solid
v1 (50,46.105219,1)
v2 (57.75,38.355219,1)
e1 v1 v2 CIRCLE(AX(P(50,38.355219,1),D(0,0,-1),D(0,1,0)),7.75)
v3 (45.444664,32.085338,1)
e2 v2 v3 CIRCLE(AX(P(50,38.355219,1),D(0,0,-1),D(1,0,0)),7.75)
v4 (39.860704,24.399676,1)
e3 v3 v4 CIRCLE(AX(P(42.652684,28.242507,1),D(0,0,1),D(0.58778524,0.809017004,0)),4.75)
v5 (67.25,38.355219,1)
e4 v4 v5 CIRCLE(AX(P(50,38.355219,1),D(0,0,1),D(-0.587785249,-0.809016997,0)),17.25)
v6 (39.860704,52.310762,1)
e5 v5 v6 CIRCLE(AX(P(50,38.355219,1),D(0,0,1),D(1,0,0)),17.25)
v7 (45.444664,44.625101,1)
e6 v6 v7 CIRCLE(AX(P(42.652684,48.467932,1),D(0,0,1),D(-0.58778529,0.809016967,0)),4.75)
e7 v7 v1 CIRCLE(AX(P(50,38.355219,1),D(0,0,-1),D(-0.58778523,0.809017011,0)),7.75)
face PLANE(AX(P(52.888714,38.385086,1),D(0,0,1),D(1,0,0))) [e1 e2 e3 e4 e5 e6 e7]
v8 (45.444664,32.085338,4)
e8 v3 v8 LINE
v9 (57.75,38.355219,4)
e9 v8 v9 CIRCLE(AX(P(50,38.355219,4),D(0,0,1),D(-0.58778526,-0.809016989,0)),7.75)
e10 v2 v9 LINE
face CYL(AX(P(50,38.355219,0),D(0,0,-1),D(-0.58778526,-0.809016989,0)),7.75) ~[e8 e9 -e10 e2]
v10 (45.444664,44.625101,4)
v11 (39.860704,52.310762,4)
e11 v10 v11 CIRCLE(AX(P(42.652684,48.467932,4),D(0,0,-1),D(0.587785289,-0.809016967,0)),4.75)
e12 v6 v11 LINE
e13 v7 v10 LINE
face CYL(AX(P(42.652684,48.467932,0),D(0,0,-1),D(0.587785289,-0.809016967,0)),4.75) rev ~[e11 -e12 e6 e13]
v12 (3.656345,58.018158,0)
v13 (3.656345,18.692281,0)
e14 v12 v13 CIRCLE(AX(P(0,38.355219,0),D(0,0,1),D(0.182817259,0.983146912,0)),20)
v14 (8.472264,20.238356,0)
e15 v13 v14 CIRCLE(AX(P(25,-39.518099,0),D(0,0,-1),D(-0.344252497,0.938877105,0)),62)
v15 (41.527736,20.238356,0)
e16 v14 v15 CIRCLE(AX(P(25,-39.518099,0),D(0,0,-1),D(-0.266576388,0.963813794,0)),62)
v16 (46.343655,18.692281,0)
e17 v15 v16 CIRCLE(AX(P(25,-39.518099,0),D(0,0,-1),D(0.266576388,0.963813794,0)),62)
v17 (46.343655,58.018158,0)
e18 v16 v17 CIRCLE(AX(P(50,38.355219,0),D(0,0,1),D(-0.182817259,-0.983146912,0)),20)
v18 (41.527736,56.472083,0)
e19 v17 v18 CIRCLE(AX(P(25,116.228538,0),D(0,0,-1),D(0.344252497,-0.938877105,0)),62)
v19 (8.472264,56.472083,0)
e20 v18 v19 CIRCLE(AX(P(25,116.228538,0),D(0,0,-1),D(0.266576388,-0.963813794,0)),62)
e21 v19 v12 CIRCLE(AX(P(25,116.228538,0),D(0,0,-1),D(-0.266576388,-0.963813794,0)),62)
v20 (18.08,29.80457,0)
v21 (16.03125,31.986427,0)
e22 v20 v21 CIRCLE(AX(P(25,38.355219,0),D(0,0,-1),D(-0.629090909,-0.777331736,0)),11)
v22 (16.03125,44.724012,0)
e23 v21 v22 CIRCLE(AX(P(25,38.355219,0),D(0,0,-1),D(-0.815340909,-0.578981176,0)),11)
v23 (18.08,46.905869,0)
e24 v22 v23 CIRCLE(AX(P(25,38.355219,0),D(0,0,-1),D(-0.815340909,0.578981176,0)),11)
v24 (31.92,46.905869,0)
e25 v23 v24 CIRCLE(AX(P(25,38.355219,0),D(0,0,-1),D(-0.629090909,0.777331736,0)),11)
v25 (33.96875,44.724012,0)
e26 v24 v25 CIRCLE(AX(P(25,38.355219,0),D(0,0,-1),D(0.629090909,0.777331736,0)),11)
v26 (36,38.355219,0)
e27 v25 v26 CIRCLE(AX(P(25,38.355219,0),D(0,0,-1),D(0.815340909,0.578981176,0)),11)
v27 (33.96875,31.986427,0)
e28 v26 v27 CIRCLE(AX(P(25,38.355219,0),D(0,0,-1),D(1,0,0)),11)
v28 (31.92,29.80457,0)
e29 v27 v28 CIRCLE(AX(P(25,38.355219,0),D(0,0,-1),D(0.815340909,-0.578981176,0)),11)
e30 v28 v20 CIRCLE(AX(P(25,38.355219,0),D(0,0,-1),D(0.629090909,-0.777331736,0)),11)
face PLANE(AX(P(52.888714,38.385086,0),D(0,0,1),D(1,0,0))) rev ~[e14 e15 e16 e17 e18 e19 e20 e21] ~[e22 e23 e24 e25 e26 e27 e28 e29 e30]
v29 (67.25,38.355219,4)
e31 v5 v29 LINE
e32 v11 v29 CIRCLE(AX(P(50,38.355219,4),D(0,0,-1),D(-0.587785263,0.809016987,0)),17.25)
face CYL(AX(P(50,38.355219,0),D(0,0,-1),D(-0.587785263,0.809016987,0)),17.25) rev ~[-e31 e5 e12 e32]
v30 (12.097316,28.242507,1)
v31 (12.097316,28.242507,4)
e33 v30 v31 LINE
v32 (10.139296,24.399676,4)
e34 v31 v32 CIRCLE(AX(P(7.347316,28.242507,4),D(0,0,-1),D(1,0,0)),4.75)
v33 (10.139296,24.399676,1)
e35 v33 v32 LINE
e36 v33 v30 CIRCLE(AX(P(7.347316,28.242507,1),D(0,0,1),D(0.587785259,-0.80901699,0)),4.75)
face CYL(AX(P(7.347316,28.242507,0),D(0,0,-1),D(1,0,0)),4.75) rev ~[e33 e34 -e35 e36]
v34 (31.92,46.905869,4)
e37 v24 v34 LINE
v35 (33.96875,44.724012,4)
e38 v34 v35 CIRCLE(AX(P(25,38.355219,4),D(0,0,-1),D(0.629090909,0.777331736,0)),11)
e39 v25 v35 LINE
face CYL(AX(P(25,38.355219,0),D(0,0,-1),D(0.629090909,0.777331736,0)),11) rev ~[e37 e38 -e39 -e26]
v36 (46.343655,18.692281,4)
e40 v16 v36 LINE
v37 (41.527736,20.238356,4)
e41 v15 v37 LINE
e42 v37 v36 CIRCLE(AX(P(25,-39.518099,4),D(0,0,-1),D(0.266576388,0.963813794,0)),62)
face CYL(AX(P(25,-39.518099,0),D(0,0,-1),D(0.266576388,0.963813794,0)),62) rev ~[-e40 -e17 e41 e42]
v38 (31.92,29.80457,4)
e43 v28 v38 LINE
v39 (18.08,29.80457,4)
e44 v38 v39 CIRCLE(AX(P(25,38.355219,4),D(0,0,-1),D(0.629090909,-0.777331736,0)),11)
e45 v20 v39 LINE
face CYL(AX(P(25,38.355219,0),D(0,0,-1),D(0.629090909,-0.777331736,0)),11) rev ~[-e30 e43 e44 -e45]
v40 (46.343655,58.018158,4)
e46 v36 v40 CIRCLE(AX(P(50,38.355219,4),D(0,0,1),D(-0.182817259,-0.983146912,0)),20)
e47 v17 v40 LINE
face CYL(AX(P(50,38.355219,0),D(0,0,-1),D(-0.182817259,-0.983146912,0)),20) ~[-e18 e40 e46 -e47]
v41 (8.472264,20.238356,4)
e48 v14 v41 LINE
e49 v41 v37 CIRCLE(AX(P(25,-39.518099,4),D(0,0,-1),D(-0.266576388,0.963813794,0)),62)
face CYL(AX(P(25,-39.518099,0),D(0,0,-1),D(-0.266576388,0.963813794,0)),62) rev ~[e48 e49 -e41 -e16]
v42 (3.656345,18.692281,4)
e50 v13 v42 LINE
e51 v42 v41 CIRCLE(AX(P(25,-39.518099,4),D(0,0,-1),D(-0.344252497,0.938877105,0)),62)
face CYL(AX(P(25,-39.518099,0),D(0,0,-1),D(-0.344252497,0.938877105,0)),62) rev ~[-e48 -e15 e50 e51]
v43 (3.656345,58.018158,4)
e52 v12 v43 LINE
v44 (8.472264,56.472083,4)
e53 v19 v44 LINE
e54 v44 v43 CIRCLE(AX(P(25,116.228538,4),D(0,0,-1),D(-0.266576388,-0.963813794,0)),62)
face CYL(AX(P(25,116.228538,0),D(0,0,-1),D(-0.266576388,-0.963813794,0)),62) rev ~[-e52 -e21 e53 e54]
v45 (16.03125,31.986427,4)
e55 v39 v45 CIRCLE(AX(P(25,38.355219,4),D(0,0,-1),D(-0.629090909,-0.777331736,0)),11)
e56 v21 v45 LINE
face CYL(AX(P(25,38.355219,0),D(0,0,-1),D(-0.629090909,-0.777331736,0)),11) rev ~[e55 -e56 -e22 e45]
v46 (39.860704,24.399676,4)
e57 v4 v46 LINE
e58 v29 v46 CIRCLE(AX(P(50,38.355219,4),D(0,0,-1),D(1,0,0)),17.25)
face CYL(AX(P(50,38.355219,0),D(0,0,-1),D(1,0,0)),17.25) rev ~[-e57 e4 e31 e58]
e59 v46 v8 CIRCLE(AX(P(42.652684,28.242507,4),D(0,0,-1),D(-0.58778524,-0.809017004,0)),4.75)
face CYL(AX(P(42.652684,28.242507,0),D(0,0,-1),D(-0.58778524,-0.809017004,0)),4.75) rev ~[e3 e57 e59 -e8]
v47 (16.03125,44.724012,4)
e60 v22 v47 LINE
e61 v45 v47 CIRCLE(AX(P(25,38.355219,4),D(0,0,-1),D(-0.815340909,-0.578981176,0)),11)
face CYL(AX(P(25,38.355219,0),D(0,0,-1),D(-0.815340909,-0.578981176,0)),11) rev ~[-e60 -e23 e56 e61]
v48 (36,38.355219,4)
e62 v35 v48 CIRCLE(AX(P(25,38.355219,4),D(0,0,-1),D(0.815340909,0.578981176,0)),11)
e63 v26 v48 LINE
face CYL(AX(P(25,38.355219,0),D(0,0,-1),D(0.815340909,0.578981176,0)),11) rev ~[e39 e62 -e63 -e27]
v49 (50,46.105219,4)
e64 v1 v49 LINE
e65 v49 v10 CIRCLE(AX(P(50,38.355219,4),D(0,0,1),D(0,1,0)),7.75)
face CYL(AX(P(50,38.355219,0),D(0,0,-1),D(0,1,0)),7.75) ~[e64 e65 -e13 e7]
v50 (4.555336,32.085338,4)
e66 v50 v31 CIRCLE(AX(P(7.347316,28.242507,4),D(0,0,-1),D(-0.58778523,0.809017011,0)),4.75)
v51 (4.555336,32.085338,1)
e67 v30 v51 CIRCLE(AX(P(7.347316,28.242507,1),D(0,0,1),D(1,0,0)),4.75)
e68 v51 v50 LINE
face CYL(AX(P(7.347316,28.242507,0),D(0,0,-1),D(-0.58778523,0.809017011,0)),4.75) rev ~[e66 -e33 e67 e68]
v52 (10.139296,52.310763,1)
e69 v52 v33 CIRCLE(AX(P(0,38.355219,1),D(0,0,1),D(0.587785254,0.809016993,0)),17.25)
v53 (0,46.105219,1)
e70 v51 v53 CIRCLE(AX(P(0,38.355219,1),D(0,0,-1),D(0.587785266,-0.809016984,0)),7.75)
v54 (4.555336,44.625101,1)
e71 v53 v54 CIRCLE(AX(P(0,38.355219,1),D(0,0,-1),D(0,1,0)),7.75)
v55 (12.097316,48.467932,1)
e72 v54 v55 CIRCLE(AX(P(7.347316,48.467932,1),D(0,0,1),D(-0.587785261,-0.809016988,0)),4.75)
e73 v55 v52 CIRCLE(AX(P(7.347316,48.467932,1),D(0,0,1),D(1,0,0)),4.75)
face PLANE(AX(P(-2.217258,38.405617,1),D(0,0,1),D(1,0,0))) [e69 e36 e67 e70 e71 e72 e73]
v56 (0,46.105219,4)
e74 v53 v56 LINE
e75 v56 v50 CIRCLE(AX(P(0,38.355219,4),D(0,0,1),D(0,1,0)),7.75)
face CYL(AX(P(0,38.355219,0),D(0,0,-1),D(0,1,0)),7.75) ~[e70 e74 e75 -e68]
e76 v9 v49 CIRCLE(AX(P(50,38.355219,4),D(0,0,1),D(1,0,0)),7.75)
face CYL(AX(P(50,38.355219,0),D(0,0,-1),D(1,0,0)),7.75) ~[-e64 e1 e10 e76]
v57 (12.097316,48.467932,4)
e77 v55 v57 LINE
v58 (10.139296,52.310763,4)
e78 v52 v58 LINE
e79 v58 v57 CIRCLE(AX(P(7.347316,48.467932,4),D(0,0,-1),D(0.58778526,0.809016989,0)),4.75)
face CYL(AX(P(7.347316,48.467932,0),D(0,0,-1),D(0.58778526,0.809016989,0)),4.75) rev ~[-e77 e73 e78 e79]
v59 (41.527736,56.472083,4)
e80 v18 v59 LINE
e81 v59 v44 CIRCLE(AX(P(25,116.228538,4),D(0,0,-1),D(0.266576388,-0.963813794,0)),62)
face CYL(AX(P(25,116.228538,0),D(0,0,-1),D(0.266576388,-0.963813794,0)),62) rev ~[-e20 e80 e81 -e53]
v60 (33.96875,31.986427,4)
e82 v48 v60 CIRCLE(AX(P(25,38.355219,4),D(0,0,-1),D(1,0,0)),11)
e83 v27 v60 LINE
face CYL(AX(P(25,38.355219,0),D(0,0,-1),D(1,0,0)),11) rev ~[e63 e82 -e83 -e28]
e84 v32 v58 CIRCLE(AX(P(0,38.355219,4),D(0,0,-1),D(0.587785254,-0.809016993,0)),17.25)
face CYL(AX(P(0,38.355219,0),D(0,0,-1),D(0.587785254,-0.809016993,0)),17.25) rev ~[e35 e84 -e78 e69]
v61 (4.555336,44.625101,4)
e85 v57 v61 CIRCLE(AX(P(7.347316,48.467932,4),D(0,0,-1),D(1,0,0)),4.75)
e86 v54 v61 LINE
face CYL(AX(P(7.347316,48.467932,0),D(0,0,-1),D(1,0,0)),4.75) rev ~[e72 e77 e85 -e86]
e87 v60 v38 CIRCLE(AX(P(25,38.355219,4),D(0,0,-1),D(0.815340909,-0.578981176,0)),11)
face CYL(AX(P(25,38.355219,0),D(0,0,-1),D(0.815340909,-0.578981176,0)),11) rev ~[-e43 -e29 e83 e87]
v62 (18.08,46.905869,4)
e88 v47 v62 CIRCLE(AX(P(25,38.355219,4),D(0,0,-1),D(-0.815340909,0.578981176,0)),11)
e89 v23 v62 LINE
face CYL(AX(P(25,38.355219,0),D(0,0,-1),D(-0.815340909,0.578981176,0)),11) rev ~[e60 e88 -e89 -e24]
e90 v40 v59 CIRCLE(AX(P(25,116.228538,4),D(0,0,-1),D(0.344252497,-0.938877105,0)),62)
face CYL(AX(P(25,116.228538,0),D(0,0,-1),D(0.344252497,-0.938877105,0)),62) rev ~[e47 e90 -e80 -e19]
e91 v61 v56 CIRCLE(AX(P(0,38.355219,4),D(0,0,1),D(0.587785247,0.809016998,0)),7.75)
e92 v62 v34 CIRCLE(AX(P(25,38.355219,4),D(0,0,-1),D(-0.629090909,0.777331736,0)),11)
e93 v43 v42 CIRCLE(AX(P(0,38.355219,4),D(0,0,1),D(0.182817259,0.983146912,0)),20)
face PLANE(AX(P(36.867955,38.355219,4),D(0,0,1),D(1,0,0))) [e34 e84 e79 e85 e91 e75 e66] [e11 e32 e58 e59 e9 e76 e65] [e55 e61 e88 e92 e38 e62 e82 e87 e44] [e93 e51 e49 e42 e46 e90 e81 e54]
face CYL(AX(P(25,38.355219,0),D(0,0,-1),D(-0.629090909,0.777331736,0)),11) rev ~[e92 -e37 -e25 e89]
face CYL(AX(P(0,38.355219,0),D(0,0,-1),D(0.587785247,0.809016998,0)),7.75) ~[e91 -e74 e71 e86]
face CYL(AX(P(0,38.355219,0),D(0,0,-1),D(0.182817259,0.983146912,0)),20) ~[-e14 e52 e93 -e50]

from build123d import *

# Parameters (mm, degrees)
F1_DEPTH = 4
F2_DEPTH = 1


with BuildPart() as f1:
    # F0 (on Top) → F1 (new body)
    with BuildSketch(Plane.XY):
        with BuildLine():
            ThreePointArc((33.96875, 44.7240123715), (35.4798914594, 41.6976549267), (36, 38.3552194374))
            ThreePointArc((36, 38.3552194374), (35.4798914594, 35.0127839481), (33.96875, 31.9864265033))
            ThreePointArc((33.96875, 31.9864265033), (34.890304672, 30.0329837344), (36.04875, 28.2100174464))
            ThreePointArc((36.04875, 28.2100174464), (38.9773253879, 32.9114730252), (40, 38.3552194374))
            ThreePointArc((40, 38.3552194374), (38.9773253879, 43.7989658495), (36.04875, 48.5004214283))
            ThreePointArc((36.04875, 48.5004214283), (34.890304672, 46.6774551404), (33.96875, 44.7240123715))
        make_face()
        with BuildLine():
            ThreePointArc((31.92, 46.9058685355), (33.0189287452, 45.8849459782), (33.96875, 44.7240123715))
            ThreePointArc((33.96875, 44.7240123715), (34.890304672, 46.6774551404), (36.04875, 48.5004214283))
            ThreePointArc((36.04875, 48.5004214283), (35.0671824784, 49.4751041915), (34, 50.3552194374))
            ThreePointArc((34, 50.3552194374), (32.8729423014, 48.6830408238), (31.92, 46.9058685355))
        make_face()
        with BuildLine():
            ThreePointArc((36.04875, 28.2100174464), (34.890304672, 30.0329837344), (33.96875, 31.9864265033))
            ThreePointArc((33.96875, 31.9864265033), (33.0189287452, 30.8254928966), (31.92, 29.8045703392))
            ThreePointArc((31.92, 29.8045703392), (32.8729423014, 28.027398051), (34, 26.3552194374))
            ThreePointArc((34, 26.3552194374), (35.0671824784, 27.2353346832), (36.04875, 28.2100174464))
        make_face()
        with BuildLine():
            ThreePointArc((18.08, 46.9058685355), (25, 49.3552194374), (31.92, 46.9058685355))
            ThreePointArc((31.92, 46.9058685355), (32.8729423014, 48.6830408238), (34, 50.3552194374))
            ThreePointArc((34, 50.3552194374), (25, 53.3552194374), (16, 50.3552194374))
            ThreePointArc((16, 50.3552194374), (17.1270576986, 48.6830408238), (18.08, 46.9058685355))
        make_face()
        with BuildLine():
            ThreePointArc((39.8607042186, 52.31076246), (37.804989803, 50.5553926449), (36.04875, 48.5004214283))
            ThreePointArc((36.04875, 48.5004214283), (38.9773253879, 43.7989658495), (40, 38.3552194374))
            ThreePointArc((40, 38.3552194374), (38.9773253879, 32.9114730252), (36.04875, 28.2100174464))
            ThreePointArc((36.04875, 28.2100174464), (37.8049899077, 26.1550461251), (39.8607044582, 24.3996762406))
            ThreePointArc((39.8607044582, 24.3996762406), (38.8098535793, 31.0344868958), (45.4446642345, 32.0853377748))
            ThreePointArc((45.4446642345, 32.0853377748), (42.25, 38.3552195837), (45.4446644712, 44.625101272))
            ThreePointArc((45.4446644712, 44.625101272), (38.8098537523, 45.6759517408), (39.8607042186, 52.31076246))
        make_face()
        with BuildLine():
            ThreePointArc((34, 50.3552194374), (35.0671824784, 49.4751041915), (36.04875, 48.5004214283))
            ThreePointArc((36.04875, 48.5004214283), (37.804989803, 50.5553926449), (39.8607042186, 52.31076246))
            ThreePointArc((39.8607042186, 52.31076246), (57.8313360218, 53.7250820299), (67.25, 38.3552194374))
            ThreePointArc((67.25, 38.3552194374), (57.8313361537, 22.985356912), (39.8607044582, 24.3996762406))
            ThreePointArc((39.8607044582, 24.3996762406), (37.8049899077, 26.1550461251), (36.04875, 28.2100174464))
            ThreePointArc((36.04875, 28.2100174464), (35.0671824784, 27.2353346832), (34, 26.3552194374))
            ThreePointArc((34, 26.3552194374), (37.3874296651, 22.8335227019), (41.5277360562, 20.2383559211))
            ThreePointArc((41.5277360562, 20.2383559211), (43.9514682435, 19.5144497823), (46.3436548255, 18.6922812041))
            ThreePointArc((46.3436548255, 18.6922812041), (62.7842304522, 22.9746000823), (70, 38.3552194374))
            ThreePointArc((70, 38.3552194374), (62.7842304522, 53.7358387924), (46.3436548255, 58.0181576706))
            ThreePointArc((46.3436548255, 58.0181576706), (43.9514682435, 57.1959890924), (41.5277360562, 56.4720829536))
            ThreePointArc((41.5277360562, 56.4720829536), (37.3874296651, 53.8769161728), (34, 50.3552194374))
        make_face()
        with BuildLine():
            ThreePointArc((34, 26.3552194374), (32.8729423014, 28.027398051), (31.92, 29.8045703392))
            ThreePointArc((31.92, 29.8045703392), (25, 27.3552194374), (18.08, 29.8045703392))
            ThreePointArc((18.08, 29.8045703392), (17.1270576986, 28.027398051), (16, 26.3552194374))
            ThreePointArc((16, 26.3552194374), (25, 23.3552194374), (34, 26.3552194374))
        make_face()
        with BuildLine():
            ThreePointArc((16.03125, 44.7240123715), (16.9810712548, 45.8849459782), (18.08, 46.9058685355))
            ThreePointArc((18.08, 46.9058685355), (17.1270576986, 48.6830408238), (16, 50.3552194374))
            ThreePointArc((16, 50.3552194374), (14.9328175216, 49.4751041915), (13.95125, 48.5004214283))
            ThreePointArc((13.95125, 48.5004214283), (15.109695328, 46.6774551404), (16.03125, 44.7240123715))
        make_face()
        with BuildLine():
            ThreePointArc((16, 50.3552194374), (25, 53.3552194374), (34, 50.3552194374))
            ThreePointArc((34, 50.3552194374), (37.3874296651, 53.8769161728), (41.5277360562, 56.4720829536))
            ThreePointArc((41.5277360562, 56.4720829536), (25, 54.228538177), (8.4722639438, 56.4720829536))
            ThreePointArc((8.4722639438, 56.4720829536), (12.6125703349, 53.8769161728), (16, 50.3552194374))
        make_face()
        with BuildLine():
            ThreePointArc((16, 26.3552194374), (17.1270576986, 28.027398051), (18.08, 29.8045703392))
            ThreePointArc((18.08, 29.8045703392), (16.9810712548, 30.8254928966), (16.03125, 31.9864265033))
            ThreePointArc((16.03125, 31.9864265033), (15.109695328, 30.0329837344), (13.95125, 28.2100174464))
            ThreePointArc((13.95125, 28.2100174464), (14.9328175216, 27.2353346832), (16, 26.3552194374))
        make_face()
        with BuildLine():
            ThreePointArc((41.5277360562, 20.2383559211), (37.3874296651, 22.8335227019), (34, 26.3552194374))
            ThreePointArc((34, 26.3552194374), (25, 23.3552194374), (16, 26.3552194374))
            ThreePointArc((16, 26.3552194374), (12.6125703349, 22.8335227019), (8.4722639438, 20.2383559211))
            ThreePointArc((8.4722639438, 20.2383559211), (25, 22.4819006978), (41.5277360562, 20.2383559211))
        make_face()
        with BuildLine():
            ThreePointArc((16.03125, 31.9864265033), (14, 38.3552194374), (16.03125, 44.7240123715))
            ThreePointArc((16.03125, 44.7240123715), (15.109695328, 46.6774551404), (13.95125, 48.5004214283))
            ThreePointArc((13.95125, 48.5004214283), (10, 38.3552194374), (13.95125, 28.2100174464))
            ThreePointArc((13.95125, 28.2100174464), (15.109695328, 30.0329837344), (16.03125, 31.9864265033))
        make_face()
        with BuildLine():
            ThreePointArc((13.95125, 48.5004214283), (14.9328175216, 49.4751041915), (16, 50.3552194374))
            ThreePointArc((16, 50.3552194374), (12.6125703349, 53.8769161728), (8.4722639438, 56.4720829536))
            ThreePointArc((8.4722639438, 56.4720829536), (6.0485317565, 57.1959890924), (3.6563451745, 58.0181576706))
            ThreePointArc((3.6563451745, 58.0181576706), (-20, 38.3552194374), (3.6563451745, 18.6922812041))
            ThreePointArc((3.6563451745, 18.6922812041), (6.0485317565, 19.5144497823), (8.4722639438, 20.2383559211))
            ThreePointArc((8.4722639438, 20.2383559211), (12.6125703349, 22.8335227019), (16, 26.3552194374))
            ThreePointArc((16, 26.3552194374), (14.9328175216, 27.2353346832), (13.95125, 28.2100174464))
            ThreePointArc((13.95125, 28.2100174464), (12.1950101323, 26.1550461651), (10.1392956333, 24.3996763071))
            ThreePointArc((10.1392956333, 24.3996763071), (-17.25, 38.3552194393), (10.1392956365, 52.3107625653))
            ThreePointArc((10.1392956365, 52.3107625653), (12.1950101337, 50.5553927082), (13.95125, 48.5004214283))
        make_face()
        with BuildLine():
            ThreePointArc((50, 46.1052194374), (47.6051183973, 45.7259074724), (45.4446644712, 44.625101272))
            ThreePointArc((45.4446644712, 44.625101272), (42.25, 38.3552195837), (45.4446642345, 32.0853377748))
            ThreePointArc((45.4446642345, 32.0853377748), (53.5184263398, 31.449918858), (57.75, 38.3552194374))
            ThreePointArc((57.75, 38.3552194374), (55.4800775542, 43.8352969916), (50, 46.1052194374))
        make_face()
        with BuildLine():
            ThreePointArc((13.95125, 28.2100174464), (10, 38.3552194374), (13.95125, 48.5004214283))
            ThreePointArc((13.95125, 48.5004214283), (12.1950101337, 50.5553927082), (10.1392956365, 52.3107625653))
            ThreePointArc((10.1392956365, 52.3107625653), (11.5795966532, 50.6243867219), (12.0973156537, 48.4679318671))
            ThreePointArc((12.0973156537, 48.4679318671), (9.503770504, 44.2356508652), (4.5553356627, 44.6251011747))
            ThreePointArc((4.5553356627, 44.6251011747), (6.9053005505, 41.8736458338), (7.75, 38.3552194374))
            ThreePointArc((7.75, 38.3552194374), (6.9053005928, 34.8367931239), (4.5553358133, 32.0853378094))
            ThreePointArc((4.5553358133, 32.0853378094), (9.5037705869, 32.4747879673), (12.0973156537, 28.2425070077))
            ThreePointArc((12.0973156537, 28.2425070077), (11.5795966523, 26.0860521511), (10.1392956333, 24.3996763071))
            ThreePointArc((10.1392956333, 24.3996763071), (12.1950101323, 26.1550461651), (13.95125, 28.2100174464))
        make_face()
        with BuildLine():
            ThreePointArc((7.75, 38.3552194374), (6.9053005505, 41.8736458338), (4.5553356627, 44.6251011747))
            ThreePointArc((4.5553356627, 44.6251011747), (2.3948816814, 45.7259074468), (0, 46.1052194374))
            ThreePointArc((0, 46.1052194374), (-7.3706879807, 35.9603376675), (4.5553358133, 32.0853378094))
            ThreePointArc((4.5553358133, 32.0853378094), (6.9053005928, 34.8367931239), (7.75, 38.3552194374))
        make_face()
    extrude(amount=F1_DEPTH)

    # F0 (on Top) → F2 (join)
    with BuildSketch(Plane.XY):
        with BuildLine():
            ThreePointArc((67.25, 38.3552194374), (57.8313360218, 53.7250820299), (39.8607042186, 52.31076246))
            ThreePointArc((39.8607042186, 52.31076246), (44.8091391214, 52.7002129073), (47.4026843463, 48.4679318671))
            ThreePointArc((47.4026843463, 48.4679318671), (46.8849653857, 46.3114770905), (45.4446644712, 44.625101272))
            ThreePointArc((45.4446644712, 44.625101272), (47.6051183973, 45.7259074724), (50, 46.1052194374))
            ThreePointArc((50, 46.1052194374), (55.4800775542, 43.8352969916), (57.75, 38.3552194374))
            ThreePointArc((57.75, 38.3552194374), (53.5184263398, 31.449918858), (45.4446642345, 32.0853377748))
            ThreePointArc((45.4446642345, 32.0853377748), (46.8849653193, 30.3989619146), (47.4026843463, 28.2425070077))
            ThreePointArc((47.4026843463, 28.2425070077), (44.8091392533, 24.0102260347), (39.8607044582, 24.3996762406))
            ThreePointArc((39.8607044582, 24.3996762406), (57.8313361537, 22.985356912), (67.25, 38.3552194374))
        make_face()
        with BuildLine():
            ThreePointArc((47.4026843463, 48.4679318671), (44.8091391214, 52.7002129073), (39.8607042186, 52.31076246))
            ThreePointArc((39.8607042186, 52.31076246), (38.8098537523, 45.6759517408), (45.4446644712, 44.625101272))
            ThreePointArc((45.4446644712, 44.625101272), (46.8849653857, 46.3114770905), (47.4026843463, 48.4679318671))
        make_face()
        with BuildLine():
            ThreePointArc((45.4446642345, 32.0853377748), (38.8098535793, 31.0344868958), (39.8607044582, 24.3996762406))
            ThreePointArc((39.8607044582, 24.3996762406), (44.8091392533, 24.0102260347), (47.4026843463, 28.2425070077))
            ThreePointArc((47.4026843463, 28.2425070077), (46.8849653193, 30.3989619146), (45.4446642345, 32.0853377748))
        make_face()
        with BuildLine():
            ThreePointArc((4.5553356627, 44.6251011747), (3.5044849583, 51.2599118539), (10.1392956365, 52.3107625653))
            ThreePointArc((10.1392956365, 52.3107625653), (-17.25, 38.3552194393), (10.1392956333, 24.3996763071))
            ThreePointArc((10.1392956333, 24.3996763071), (3.5044849025, 25.4505270977), (4.5553358133, 32.0853378094))
            ThreePointArc((4.5553358133, 32.0853378094), (-7.3706879807, 35.9603376675), (0, 46.1052194374))
            ThreePointArc((0, 46.1052194374), (2.3948816814, 45.7259074468), (4.5553356627, 44.6251011747))
        make_face()
        with BuildLine():
            ThreePointArc((12.0973156537, 48.4679318671), (11.5795966532, 50.6243867219), (10.1392956365, 52.3107625653))
            ThreePointArc((10.1392956365, 52.3107625653), (3.5044849583, 51.2599118539), (4.5553356627, 44.6251011747))
            ThreePointArc((4.5553356627, 44.6251011747), (9.503770504, 44.2356508652), (12.0973156537, 48.4679318671))
        make_face()
        with BuildLine():
            ThreePointArc((4.5553358133, 32.0853378094), (3.5044849025, 25.4505270977), (10.1392956333, 24.3996763071))
            ThreePointArc((10.1392956333, 24.3996763071), (11.5795966523, 26.0860521511), (12.0973156537, 28.2425070077))
            ThreePointArc((12.0973156537, 28.2425070077), (9.5037705869, 32.4747879673), (4.5553358133, 32.0853378094))
        make_face()
    extrude(amount=F2_DEPTH)


solid = f1.part
